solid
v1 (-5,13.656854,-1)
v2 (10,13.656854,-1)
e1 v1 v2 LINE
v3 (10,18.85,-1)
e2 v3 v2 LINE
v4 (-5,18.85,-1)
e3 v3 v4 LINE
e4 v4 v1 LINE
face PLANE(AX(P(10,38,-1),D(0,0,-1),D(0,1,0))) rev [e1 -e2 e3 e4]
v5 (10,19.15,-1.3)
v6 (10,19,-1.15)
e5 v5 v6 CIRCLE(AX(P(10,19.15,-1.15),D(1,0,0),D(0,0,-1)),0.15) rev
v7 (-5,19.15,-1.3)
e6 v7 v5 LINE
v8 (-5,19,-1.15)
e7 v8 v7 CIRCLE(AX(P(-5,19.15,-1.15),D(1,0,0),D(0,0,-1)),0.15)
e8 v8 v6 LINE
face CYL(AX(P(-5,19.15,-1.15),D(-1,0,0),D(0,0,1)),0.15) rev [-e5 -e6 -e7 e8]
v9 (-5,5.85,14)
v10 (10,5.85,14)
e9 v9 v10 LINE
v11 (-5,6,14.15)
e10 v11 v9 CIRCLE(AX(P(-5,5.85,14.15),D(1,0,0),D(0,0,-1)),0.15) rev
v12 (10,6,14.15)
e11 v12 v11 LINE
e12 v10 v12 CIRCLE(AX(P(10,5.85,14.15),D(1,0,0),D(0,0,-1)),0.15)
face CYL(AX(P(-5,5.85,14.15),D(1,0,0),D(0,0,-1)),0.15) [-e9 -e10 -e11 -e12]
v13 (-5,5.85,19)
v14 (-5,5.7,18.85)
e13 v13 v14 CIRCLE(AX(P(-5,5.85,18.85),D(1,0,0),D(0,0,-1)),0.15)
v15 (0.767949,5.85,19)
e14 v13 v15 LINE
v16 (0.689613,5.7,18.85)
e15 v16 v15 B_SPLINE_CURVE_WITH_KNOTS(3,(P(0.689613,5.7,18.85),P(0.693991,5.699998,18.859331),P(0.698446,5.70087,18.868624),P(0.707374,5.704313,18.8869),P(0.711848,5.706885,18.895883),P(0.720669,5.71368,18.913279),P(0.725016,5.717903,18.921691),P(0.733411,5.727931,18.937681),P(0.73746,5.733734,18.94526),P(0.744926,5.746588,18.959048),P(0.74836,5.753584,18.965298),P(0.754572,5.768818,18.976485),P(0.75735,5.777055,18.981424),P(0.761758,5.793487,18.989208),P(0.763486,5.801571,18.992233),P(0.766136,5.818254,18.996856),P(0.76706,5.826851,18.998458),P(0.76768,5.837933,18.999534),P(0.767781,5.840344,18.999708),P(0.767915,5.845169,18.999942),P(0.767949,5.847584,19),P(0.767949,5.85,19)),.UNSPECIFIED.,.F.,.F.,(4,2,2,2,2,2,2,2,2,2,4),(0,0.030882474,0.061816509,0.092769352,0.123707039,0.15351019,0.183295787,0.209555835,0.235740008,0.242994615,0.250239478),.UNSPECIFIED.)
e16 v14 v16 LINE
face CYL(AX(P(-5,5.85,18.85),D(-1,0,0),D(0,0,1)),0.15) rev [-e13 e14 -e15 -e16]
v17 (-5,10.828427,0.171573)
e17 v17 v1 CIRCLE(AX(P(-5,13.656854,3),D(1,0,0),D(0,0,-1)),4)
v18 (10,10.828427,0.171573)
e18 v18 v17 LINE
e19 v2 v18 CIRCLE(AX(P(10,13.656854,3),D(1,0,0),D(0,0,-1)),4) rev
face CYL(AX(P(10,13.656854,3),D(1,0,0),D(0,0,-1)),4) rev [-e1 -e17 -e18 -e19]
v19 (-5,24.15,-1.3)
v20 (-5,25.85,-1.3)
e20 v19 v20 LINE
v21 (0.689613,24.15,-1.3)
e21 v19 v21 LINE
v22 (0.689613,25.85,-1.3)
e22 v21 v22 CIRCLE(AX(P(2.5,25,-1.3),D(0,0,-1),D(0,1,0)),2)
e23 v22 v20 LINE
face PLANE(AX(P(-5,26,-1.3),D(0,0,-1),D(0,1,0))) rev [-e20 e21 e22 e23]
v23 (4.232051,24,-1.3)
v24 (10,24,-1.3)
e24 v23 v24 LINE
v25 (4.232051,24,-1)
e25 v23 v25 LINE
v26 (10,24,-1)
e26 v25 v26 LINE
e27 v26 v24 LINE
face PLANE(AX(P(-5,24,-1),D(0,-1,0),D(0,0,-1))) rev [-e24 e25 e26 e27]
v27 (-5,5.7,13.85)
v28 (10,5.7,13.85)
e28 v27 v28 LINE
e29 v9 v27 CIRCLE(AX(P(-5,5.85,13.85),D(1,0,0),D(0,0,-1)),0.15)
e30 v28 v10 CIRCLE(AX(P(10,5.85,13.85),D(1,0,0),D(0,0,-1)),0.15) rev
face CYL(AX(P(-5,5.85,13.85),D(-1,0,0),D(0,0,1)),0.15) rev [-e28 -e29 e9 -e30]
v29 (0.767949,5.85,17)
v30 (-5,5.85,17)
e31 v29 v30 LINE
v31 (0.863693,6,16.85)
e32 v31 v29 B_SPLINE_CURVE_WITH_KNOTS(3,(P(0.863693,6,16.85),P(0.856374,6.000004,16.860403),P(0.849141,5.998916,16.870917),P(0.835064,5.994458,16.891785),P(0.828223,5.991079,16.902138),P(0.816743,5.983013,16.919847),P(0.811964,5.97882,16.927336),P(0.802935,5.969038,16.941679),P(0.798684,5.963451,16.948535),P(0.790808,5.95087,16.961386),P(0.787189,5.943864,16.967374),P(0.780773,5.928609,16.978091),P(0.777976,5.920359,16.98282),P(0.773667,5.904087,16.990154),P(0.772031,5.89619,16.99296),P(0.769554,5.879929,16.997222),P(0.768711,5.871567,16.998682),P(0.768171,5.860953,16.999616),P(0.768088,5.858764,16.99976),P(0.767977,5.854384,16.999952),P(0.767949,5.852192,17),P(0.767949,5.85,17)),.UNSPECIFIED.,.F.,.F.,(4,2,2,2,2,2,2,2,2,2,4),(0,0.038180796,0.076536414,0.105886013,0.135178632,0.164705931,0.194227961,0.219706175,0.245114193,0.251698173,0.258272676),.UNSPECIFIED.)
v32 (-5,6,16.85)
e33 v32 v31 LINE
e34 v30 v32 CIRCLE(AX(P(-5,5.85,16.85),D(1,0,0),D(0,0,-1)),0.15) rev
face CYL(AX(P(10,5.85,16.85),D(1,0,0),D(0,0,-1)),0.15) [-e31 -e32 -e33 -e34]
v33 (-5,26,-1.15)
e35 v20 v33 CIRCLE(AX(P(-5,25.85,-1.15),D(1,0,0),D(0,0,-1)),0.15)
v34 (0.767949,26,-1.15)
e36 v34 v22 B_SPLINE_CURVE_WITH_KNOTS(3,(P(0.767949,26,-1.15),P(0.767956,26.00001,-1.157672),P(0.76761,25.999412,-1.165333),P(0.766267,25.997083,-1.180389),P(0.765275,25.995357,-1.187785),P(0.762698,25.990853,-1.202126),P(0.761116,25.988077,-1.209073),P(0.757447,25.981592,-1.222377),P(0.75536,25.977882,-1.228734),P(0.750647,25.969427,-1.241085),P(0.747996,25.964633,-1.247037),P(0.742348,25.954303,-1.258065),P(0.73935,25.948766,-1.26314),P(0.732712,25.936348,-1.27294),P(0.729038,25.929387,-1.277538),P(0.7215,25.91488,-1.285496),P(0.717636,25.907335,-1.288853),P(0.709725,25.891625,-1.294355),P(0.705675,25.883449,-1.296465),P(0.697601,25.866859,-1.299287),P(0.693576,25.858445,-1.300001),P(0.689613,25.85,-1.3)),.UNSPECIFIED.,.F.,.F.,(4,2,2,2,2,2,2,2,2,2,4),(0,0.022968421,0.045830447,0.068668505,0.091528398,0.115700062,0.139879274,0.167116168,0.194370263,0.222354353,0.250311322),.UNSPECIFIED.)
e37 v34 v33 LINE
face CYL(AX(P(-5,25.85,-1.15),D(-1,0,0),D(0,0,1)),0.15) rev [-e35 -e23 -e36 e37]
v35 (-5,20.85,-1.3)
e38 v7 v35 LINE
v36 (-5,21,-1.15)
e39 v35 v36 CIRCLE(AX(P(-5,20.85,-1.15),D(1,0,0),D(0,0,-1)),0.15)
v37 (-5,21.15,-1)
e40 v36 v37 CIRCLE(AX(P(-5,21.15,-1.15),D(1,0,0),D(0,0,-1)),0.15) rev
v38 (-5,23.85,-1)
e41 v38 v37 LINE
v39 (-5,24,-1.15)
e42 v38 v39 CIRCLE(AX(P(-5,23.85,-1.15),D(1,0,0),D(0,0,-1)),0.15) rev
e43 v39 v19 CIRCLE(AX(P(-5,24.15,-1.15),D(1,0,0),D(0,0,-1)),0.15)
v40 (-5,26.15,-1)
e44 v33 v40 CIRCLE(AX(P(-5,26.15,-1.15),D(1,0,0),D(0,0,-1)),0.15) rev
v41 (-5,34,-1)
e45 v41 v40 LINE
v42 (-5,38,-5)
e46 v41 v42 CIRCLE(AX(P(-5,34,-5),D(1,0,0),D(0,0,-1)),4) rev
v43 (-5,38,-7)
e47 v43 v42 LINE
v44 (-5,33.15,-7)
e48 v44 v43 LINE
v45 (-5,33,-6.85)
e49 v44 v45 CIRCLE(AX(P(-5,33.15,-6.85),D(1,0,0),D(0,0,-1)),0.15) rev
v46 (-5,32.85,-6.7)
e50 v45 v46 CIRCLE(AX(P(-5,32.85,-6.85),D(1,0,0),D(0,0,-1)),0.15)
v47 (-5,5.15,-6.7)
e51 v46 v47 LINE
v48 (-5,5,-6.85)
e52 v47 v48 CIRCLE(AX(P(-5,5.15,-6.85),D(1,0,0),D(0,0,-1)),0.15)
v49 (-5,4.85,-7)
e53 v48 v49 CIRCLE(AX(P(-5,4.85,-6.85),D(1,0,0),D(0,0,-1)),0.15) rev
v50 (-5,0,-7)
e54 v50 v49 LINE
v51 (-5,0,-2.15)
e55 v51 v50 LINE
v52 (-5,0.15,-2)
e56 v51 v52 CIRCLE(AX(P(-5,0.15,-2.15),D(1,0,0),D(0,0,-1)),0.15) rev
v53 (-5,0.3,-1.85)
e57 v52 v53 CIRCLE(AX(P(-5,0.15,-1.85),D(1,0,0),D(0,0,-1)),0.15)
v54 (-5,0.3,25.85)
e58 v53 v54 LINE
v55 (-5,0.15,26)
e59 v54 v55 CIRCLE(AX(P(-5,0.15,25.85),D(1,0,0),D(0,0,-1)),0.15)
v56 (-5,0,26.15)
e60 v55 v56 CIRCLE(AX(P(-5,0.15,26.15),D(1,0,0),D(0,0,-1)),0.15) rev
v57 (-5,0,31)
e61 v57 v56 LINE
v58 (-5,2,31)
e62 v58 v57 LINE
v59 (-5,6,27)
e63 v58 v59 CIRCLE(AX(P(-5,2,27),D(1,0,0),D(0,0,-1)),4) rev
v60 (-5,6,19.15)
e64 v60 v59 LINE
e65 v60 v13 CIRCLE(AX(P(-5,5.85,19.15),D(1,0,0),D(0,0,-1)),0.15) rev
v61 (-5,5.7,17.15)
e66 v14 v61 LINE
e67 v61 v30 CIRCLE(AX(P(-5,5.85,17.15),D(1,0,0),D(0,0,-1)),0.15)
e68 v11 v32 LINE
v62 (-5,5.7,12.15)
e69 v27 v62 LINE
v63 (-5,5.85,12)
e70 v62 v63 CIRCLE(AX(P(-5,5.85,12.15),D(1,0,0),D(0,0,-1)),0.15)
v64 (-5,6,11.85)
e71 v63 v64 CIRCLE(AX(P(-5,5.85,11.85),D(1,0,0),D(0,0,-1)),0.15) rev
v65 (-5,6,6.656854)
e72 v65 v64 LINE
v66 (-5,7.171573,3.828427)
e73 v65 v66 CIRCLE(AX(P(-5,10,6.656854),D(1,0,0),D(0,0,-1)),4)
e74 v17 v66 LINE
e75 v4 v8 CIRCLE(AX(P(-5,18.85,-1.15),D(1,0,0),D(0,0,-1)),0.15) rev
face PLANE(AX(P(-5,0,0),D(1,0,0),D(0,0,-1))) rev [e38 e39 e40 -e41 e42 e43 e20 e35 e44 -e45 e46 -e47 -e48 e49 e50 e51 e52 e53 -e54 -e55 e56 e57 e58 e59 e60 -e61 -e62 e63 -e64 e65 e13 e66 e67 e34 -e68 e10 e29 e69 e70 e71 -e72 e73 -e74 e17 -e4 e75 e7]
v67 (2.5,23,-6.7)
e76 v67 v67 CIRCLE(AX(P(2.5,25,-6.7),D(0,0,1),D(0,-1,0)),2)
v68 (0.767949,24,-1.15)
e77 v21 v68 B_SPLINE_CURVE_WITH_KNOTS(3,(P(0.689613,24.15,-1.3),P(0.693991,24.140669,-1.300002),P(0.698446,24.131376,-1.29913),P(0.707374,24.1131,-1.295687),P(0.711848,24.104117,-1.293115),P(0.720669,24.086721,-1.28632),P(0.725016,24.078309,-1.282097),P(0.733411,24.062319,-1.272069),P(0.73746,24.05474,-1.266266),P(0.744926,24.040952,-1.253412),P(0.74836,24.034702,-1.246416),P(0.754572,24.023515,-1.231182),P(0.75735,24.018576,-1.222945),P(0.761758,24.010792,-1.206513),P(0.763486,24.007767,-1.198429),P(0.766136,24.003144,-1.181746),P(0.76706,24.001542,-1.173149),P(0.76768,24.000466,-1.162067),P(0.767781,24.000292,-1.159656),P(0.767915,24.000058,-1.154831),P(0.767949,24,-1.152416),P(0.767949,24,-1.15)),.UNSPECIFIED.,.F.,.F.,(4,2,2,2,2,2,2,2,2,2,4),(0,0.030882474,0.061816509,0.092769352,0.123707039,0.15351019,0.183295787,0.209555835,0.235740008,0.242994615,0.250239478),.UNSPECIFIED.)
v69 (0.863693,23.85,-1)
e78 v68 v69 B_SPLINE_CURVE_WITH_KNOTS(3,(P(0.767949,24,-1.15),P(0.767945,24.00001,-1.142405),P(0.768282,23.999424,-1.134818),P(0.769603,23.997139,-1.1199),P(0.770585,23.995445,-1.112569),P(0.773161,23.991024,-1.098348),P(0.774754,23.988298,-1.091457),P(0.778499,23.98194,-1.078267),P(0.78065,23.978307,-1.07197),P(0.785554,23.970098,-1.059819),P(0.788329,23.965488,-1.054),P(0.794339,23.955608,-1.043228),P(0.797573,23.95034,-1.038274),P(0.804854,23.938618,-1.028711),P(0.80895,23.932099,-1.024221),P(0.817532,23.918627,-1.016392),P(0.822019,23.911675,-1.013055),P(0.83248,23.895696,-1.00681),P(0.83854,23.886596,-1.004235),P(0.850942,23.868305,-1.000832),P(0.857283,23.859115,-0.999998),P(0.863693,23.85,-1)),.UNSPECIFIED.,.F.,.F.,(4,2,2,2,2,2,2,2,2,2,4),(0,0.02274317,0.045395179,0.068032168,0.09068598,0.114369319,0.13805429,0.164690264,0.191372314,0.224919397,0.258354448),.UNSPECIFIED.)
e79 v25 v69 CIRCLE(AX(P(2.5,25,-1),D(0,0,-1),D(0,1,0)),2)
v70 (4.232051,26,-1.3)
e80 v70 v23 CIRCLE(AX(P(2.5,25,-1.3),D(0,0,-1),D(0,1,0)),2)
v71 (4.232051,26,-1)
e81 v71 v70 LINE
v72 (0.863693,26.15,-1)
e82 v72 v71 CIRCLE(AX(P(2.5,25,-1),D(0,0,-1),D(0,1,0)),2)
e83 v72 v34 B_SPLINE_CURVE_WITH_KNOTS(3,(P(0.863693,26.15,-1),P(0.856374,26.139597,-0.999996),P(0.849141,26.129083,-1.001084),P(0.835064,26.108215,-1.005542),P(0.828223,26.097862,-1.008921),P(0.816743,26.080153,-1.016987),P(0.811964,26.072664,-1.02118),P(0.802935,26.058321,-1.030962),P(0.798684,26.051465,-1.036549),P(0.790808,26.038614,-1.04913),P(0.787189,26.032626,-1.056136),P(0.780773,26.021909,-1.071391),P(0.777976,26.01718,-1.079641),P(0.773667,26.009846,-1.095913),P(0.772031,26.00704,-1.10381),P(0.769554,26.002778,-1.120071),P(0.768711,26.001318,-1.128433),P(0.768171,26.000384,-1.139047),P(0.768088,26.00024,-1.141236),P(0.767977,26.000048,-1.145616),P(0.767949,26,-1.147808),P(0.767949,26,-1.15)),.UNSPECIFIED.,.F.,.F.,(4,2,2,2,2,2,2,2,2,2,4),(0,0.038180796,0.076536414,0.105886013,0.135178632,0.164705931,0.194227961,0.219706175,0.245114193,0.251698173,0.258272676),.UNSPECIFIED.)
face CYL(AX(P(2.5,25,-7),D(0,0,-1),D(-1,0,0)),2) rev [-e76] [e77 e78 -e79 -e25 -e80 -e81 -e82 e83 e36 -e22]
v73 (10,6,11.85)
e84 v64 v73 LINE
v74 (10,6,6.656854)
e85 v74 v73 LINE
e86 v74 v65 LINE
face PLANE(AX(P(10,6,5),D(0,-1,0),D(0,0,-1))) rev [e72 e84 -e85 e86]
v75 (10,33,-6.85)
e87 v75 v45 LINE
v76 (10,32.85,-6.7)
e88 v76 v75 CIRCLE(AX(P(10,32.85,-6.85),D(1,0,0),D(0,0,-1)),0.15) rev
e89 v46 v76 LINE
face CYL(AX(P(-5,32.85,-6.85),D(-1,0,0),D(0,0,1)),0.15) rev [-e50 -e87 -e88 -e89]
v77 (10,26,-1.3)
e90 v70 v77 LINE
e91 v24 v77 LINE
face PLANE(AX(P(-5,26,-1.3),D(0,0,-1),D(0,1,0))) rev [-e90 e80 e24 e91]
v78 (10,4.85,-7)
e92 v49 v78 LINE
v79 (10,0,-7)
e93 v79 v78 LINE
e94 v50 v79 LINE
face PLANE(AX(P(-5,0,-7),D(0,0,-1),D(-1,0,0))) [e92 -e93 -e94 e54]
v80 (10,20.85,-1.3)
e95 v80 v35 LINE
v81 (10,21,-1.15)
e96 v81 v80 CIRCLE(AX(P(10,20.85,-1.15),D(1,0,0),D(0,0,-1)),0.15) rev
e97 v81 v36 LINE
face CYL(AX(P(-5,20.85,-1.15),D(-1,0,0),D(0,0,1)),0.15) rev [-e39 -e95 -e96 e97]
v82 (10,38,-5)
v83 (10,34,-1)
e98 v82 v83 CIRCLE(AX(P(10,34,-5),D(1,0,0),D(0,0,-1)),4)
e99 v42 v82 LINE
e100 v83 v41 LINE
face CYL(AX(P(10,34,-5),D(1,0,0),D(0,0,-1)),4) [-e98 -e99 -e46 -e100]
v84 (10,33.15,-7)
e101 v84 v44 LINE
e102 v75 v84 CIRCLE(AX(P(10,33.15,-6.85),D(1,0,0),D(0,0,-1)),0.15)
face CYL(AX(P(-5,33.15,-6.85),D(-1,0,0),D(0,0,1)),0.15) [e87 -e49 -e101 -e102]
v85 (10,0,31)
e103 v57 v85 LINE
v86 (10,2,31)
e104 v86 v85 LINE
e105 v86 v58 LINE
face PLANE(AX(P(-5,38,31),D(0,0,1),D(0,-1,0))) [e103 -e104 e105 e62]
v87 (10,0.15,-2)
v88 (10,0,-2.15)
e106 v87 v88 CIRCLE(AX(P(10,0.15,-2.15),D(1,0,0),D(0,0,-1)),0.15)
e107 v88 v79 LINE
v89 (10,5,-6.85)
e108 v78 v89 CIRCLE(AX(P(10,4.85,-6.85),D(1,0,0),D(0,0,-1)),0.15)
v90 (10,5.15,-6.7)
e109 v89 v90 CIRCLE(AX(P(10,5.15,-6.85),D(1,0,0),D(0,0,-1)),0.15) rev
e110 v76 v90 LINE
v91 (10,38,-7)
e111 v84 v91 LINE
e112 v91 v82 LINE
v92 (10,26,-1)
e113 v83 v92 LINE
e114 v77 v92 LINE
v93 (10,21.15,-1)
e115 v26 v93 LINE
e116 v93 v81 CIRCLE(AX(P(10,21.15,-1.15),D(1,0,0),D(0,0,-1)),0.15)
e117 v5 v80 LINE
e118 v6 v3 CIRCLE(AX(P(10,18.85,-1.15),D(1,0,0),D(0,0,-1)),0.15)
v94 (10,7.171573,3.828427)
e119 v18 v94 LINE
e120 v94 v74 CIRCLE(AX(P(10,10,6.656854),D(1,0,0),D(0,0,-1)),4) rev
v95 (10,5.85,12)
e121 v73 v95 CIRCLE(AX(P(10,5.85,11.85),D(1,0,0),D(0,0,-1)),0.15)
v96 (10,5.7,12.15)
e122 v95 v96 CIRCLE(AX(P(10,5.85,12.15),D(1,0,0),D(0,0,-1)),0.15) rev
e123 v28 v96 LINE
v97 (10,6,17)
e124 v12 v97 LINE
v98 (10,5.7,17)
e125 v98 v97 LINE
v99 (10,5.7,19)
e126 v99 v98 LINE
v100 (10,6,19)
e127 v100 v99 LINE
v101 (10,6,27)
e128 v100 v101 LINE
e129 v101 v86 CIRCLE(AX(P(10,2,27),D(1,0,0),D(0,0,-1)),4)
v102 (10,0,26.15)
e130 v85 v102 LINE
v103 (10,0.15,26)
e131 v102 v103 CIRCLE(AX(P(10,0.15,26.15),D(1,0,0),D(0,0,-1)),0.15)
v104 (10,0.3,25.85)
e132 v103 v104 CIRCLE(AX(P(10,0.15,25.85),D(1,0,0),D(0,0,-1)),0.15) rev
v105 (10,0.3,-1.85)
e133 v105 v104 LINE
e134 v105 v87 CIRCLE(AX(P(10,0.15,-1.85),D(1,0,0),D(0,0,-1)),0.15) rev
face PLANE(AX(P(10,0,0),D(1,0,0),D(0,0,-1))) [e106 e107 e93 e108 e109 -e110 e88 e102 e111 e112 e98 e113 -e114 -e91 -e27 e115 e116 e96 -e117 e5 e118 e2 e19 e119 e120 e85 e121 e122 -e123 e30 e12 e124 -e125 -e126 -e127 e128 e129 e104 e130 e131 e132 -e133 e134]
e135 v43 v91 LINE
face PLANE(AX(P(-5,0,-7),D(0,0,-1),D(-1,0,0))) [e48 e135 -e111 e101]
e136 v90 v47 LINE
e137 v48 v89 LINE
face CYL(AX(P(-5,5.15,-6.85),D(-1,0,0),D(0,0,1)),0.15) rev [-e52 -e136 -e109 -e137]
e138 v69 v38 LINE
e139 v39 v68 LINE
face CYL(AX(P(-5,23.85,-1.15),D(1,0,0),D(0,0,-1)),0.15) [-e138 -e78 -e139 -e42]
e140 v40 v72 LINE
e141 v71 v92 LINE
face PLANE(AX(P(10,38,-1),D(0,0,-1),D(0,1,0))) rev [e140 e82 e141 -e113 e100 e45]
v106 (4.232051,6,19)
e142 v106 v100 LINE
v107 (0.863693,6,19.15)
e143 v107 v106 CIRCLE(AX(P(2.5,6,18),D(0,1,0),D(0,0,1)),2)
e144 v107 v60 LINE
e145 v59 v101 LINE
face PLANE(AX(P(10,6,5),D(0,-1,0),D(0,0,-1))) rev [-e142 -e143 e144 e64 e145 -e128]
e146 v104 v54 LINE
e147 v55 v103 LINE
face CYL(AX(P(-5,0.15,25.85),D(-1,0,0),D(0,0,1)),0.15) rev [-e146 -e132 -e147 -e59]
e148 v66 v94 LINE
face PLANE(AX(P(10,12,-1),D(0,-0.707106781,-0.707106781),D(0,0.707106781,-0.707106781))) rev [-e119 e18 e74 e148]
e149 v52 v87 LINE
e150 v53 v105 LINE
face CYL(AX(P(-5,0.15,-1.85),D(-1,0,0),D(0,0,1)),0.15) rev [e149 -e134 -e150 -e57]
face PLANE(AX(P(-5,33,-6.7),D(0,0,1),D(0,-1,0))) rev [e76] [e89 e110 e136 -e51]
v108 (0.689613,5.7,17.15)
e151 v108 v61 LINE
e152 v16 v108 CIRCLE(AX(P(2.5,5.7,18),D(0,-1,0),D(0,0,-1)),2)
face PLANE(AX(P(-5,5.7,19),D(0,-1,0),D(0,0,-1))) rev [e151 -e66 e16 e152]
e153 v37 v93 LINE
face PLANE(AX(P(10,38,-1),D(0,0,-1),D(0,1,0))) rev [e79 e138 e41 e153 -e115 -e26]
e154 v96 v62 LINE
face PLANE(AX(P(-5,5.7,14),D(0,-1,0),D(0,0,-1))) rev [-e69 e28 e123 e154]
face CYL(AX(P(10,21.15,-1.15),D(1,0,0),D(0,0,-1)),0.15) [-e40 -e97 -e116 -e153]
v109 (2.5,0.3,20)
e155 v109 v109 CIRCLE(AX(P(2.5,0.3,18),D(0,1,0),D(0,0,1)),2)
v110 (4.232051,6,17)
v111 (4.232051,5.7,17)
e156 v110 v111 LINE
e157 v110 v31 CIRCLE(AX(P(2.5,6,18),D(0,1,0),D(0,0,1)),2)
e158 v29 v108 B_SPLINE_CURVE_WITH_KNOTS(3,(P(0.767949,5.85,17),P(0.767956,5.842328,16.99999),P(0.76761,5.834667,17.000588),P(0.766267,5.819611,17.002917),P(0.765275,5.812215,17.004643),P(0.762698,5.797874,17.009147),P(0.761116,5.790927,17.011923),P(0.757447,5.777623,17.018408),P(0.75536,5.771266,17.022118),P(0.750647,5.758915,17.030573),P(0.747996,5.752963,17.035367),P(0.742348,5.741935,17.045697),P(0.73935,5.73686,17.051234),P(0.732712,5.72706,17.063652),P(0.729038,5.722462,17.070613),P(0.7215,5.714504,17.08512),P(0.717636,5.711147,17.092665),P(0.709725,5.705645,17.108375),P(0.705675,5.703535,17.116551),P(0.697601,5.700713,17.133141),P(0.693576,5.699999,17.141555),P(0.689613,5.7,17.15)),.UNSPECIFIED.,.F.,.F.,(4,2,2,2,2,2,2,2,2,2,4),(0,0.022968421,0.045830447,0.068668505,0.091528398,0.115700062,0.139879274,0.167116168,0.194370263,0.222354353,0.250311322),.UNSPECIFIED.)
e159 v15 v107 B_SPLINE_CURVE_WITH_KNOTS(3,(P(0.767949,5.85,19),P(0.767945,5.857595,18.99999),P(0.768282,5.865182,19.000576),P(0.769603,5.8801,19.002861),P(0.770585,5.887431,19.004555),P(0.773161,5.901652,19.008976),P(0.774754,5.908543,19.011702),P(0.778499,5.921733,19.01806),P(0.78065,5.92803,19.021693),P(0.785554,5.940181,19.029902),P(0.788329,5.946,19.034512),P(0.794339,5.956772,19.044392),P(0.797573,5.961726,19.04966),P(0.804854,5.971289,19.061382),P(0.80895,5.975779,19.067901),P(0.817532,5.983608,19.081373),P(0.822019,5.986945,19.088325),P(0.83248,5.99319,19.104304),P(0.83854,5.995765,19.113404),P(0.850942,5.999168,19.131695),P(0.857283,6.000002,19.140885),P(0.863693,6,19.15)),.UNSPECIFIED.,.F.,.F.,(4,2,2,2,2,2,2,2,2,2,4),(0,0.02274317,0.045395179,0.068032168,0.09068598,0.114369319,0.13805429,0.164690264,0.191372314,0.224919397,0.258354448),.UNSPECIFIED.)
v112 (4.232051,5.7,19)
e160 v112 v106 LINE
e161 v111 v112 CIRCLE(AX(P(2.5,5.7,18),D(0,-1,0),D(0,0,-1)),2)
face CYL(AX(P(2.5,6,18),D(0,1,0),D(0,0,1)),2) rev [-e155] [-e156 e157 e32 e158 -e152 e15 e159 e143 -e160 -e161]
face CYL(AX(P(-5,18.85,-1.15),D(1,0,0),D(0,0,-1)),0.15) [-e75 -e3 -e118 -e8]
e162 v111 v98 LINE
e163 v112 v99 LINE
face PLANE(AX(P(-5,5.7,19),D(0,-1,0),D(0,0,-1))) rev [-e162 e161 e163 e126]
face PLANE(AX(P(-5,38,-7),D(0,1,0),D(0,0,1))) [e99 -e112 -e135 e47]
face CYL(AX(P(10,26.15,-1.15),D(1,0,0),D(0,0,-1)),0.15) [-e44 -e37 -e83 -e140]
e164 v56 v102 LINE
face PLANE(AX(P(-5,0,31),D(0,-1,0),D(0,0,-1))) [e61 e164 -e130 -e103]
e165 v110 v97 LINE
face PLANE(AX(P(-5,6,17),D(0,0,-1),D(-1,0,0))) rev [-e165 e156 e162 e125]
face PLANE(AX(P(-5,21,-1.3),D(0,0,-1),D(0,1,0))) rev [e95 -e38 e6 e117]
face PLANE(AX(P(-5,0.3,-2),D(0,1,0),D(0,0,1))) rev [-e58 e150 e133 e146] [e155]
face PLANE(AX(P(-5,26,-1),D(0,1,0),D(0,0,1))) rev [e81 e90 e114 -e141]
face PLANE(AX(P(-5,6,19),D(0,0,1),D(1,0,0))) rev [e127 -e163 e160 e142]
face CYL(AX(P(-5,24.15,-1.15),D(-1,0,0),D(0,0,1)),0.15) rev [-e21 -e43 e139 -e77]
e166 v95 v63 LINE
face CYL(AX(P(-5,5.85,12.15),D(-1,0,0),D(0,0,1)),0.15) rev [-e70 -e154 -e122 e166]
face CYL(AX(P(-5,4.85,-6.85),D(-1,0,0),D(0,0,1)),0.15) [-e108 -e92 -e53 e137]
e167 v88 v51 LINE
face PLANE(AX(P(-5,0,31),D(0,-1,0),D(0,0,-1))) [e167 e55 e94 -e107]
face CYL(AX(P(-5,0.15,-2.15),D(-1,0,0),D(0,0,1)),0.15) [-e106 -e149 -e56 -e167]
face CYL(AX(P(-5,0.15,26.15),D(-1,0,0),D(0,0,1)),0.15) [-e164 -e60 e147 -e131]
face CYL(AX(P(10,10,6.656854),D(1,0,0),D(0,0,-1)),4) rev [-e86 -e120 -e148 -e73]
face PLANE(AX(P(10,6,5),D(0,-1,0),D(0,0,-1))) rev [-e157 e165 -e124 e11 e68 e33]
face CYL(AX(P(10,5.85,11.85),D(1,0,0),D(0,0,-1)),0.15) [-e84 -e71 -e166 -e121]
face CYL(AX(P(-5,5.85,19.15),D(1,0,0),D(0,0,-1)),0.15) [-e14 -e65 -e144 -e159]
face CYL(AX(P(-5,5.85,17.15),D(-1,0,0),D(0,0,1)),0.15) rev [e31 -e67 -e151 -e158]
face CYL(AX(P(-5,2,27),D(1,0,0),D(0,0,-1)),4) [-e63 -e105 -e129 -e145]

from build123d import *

# Parameters (mm, degrees)
ESBO_O1_W                  = 38
ESBO_O1_H                  = 38
RESSALTO_EXTRUS_O1_DEPTH   = 15
CORTE_EXTRUS_O1_DEPTH      = 52.28352562
ESBO_O7_W                  = 0.3
ESBO_O7_H                  = 28
ESBO_O7_W_2                = 28
ESBO_O7_H_2                = 0.3
ESBO_O7_W_3                = 2
ESBO_O7_H_3                = 2
CORTE_EXTRUS_O2_DEPTH      = 52.28352562
FURO_DE_DI_METRO_7_0_7_3_D = 4
FURO_DE_DI_METRO_7_0_7_2_D = 4
FILETE1_R                  = 4
FILETE2_R                  = 0.15


with BuildPart() as part:
    # Esboço1 → Ressalto-extrusão1 (new body)
    with BuildSketch(Plane(origin=(10, 0, 0), x_dir=(0, 0, -1), z_dir=(1, 0, 0))):
        with Locations((-12, 19)):
            Rectangle(ESBO_O1_W, ESBO_O1_H)
    extrude(amount=-RESSALTO_EXTRUS_O1_DEPTH)

    # Esboço2 → Corte-extrusão1 (cut, through all)
    with BuildSketch(Plane.ZY.offset(5)):
        Polygon((31, 38), (-1, 38), (-1, 12), (5, 6), (31, 6), align=None)
    extrude(amount=-CORTE_EXTRUS_O1_DEPTH, mode=Mode.SUBTRACT)

    # Esboço7 → Corte-extrusão2 (cut, through all)
    with BuildSketch(Plane(origin=(10, 0, 0), x_dir=(0, 0, -1), z_dir=(1, 0, 0))):
        with Locations((6.85, 19)):
            Rectangle(ESBO_O7_W, ESBO_O7_H)
        with Locations((-12, 0.15)):
            Rectangle(ESBO_O7_W_2, ESBO_O7_H_2)
        with Locations((-13, 5.85)):
            Rectangle(ESBO_O7_W_3, ESBO_O7_H_2)
        with Locations((1.15, 20)):
            Rectangle(ESBO_O7_W, ESBO_O7_H_3)
        with Locations((-18, 5.85)):
            Rectangle(ESBO_O7_W_3, ESBO_O7_H_2)
        with Locations((1.15, 25)):
            Rectangle(ESBO_O7_W, ESBO_O7_H_3)
    extrude(amount=-CORTE_EXTRUS_O2_DEPTH, mode=Mode.SUBTRACT)

    # Furo de diâmetro Ø7.0 (7)3 (through all)
    with Locations(Plane(origin=(0, 6, 0), x_dir=(1, 0, 0), z_dir=(0, 1, 0))):
        with Locations((2.5, -18)):
            Hole(FURO_DE_DI_METRO_7_0_7_3_D / 2)

    # Furo de diâmetro Ø7.0 (7)2 (through all)
    with Locations(Plane(origin=(0, 0, -7), x_dir=(-1, 0, 0), z_dir=(0, 0, -1))):
        with Locations((-2.5, 25)):
            Hole(FURO_DE_DI_METRO_7_0_7_2_D / 2)

    # Filete1
    filete1_edges = [part.edges().sort_by_distance(p)[0] for p in [
        (2.5, 6, 31),
        (2.5, 6, 5),
        (2.5, 12, -1),
        (2.5, 38, -1),
    ]]
    fillet(filete1_edges, radius=FILETE1_R)

    # Filete2
    filete2_edges = [part.edges().sort_by_distance(p)[0] for p in [
        (2.5, 5, -7),
        (2.5, 5, -6.7),
        (2.5, 33, -7),
        (2.5, 33, -6.7),
        (2.5, 0, 26),
        (2.5, 0.3, 26),
        (2.5, 0.3, -2),
        (2.5, 0, -2),
        (2.5, 19, -1.3),
        (2.5, 19, -1),
        (2.5, 21, -1.3),
        (2.5, 21, -1),
        (2.5, 5.7, 14),
        (2.5, 6, 14),
        (2.5, 5.7, 12),
        (2.5, 6, 12),
        (-2.116025404, 26, -1.3),
        (-2.116025404, 24, -1.3),
        (-2.116025404, 24, -1),
        (-2.116025404, 26, -1),
        (-2.116025404, 5.7, 19),
        (-2.116025404, 5.7, 17),
        (-2.116025404, 6, 17),
        (-2.116025404, 6, 19),
    ]]
    fillet(filete2_edges, radius=FILETE2_R - 0.0001)  # a hair under: the kernel refuses the full size


solid = part.part
